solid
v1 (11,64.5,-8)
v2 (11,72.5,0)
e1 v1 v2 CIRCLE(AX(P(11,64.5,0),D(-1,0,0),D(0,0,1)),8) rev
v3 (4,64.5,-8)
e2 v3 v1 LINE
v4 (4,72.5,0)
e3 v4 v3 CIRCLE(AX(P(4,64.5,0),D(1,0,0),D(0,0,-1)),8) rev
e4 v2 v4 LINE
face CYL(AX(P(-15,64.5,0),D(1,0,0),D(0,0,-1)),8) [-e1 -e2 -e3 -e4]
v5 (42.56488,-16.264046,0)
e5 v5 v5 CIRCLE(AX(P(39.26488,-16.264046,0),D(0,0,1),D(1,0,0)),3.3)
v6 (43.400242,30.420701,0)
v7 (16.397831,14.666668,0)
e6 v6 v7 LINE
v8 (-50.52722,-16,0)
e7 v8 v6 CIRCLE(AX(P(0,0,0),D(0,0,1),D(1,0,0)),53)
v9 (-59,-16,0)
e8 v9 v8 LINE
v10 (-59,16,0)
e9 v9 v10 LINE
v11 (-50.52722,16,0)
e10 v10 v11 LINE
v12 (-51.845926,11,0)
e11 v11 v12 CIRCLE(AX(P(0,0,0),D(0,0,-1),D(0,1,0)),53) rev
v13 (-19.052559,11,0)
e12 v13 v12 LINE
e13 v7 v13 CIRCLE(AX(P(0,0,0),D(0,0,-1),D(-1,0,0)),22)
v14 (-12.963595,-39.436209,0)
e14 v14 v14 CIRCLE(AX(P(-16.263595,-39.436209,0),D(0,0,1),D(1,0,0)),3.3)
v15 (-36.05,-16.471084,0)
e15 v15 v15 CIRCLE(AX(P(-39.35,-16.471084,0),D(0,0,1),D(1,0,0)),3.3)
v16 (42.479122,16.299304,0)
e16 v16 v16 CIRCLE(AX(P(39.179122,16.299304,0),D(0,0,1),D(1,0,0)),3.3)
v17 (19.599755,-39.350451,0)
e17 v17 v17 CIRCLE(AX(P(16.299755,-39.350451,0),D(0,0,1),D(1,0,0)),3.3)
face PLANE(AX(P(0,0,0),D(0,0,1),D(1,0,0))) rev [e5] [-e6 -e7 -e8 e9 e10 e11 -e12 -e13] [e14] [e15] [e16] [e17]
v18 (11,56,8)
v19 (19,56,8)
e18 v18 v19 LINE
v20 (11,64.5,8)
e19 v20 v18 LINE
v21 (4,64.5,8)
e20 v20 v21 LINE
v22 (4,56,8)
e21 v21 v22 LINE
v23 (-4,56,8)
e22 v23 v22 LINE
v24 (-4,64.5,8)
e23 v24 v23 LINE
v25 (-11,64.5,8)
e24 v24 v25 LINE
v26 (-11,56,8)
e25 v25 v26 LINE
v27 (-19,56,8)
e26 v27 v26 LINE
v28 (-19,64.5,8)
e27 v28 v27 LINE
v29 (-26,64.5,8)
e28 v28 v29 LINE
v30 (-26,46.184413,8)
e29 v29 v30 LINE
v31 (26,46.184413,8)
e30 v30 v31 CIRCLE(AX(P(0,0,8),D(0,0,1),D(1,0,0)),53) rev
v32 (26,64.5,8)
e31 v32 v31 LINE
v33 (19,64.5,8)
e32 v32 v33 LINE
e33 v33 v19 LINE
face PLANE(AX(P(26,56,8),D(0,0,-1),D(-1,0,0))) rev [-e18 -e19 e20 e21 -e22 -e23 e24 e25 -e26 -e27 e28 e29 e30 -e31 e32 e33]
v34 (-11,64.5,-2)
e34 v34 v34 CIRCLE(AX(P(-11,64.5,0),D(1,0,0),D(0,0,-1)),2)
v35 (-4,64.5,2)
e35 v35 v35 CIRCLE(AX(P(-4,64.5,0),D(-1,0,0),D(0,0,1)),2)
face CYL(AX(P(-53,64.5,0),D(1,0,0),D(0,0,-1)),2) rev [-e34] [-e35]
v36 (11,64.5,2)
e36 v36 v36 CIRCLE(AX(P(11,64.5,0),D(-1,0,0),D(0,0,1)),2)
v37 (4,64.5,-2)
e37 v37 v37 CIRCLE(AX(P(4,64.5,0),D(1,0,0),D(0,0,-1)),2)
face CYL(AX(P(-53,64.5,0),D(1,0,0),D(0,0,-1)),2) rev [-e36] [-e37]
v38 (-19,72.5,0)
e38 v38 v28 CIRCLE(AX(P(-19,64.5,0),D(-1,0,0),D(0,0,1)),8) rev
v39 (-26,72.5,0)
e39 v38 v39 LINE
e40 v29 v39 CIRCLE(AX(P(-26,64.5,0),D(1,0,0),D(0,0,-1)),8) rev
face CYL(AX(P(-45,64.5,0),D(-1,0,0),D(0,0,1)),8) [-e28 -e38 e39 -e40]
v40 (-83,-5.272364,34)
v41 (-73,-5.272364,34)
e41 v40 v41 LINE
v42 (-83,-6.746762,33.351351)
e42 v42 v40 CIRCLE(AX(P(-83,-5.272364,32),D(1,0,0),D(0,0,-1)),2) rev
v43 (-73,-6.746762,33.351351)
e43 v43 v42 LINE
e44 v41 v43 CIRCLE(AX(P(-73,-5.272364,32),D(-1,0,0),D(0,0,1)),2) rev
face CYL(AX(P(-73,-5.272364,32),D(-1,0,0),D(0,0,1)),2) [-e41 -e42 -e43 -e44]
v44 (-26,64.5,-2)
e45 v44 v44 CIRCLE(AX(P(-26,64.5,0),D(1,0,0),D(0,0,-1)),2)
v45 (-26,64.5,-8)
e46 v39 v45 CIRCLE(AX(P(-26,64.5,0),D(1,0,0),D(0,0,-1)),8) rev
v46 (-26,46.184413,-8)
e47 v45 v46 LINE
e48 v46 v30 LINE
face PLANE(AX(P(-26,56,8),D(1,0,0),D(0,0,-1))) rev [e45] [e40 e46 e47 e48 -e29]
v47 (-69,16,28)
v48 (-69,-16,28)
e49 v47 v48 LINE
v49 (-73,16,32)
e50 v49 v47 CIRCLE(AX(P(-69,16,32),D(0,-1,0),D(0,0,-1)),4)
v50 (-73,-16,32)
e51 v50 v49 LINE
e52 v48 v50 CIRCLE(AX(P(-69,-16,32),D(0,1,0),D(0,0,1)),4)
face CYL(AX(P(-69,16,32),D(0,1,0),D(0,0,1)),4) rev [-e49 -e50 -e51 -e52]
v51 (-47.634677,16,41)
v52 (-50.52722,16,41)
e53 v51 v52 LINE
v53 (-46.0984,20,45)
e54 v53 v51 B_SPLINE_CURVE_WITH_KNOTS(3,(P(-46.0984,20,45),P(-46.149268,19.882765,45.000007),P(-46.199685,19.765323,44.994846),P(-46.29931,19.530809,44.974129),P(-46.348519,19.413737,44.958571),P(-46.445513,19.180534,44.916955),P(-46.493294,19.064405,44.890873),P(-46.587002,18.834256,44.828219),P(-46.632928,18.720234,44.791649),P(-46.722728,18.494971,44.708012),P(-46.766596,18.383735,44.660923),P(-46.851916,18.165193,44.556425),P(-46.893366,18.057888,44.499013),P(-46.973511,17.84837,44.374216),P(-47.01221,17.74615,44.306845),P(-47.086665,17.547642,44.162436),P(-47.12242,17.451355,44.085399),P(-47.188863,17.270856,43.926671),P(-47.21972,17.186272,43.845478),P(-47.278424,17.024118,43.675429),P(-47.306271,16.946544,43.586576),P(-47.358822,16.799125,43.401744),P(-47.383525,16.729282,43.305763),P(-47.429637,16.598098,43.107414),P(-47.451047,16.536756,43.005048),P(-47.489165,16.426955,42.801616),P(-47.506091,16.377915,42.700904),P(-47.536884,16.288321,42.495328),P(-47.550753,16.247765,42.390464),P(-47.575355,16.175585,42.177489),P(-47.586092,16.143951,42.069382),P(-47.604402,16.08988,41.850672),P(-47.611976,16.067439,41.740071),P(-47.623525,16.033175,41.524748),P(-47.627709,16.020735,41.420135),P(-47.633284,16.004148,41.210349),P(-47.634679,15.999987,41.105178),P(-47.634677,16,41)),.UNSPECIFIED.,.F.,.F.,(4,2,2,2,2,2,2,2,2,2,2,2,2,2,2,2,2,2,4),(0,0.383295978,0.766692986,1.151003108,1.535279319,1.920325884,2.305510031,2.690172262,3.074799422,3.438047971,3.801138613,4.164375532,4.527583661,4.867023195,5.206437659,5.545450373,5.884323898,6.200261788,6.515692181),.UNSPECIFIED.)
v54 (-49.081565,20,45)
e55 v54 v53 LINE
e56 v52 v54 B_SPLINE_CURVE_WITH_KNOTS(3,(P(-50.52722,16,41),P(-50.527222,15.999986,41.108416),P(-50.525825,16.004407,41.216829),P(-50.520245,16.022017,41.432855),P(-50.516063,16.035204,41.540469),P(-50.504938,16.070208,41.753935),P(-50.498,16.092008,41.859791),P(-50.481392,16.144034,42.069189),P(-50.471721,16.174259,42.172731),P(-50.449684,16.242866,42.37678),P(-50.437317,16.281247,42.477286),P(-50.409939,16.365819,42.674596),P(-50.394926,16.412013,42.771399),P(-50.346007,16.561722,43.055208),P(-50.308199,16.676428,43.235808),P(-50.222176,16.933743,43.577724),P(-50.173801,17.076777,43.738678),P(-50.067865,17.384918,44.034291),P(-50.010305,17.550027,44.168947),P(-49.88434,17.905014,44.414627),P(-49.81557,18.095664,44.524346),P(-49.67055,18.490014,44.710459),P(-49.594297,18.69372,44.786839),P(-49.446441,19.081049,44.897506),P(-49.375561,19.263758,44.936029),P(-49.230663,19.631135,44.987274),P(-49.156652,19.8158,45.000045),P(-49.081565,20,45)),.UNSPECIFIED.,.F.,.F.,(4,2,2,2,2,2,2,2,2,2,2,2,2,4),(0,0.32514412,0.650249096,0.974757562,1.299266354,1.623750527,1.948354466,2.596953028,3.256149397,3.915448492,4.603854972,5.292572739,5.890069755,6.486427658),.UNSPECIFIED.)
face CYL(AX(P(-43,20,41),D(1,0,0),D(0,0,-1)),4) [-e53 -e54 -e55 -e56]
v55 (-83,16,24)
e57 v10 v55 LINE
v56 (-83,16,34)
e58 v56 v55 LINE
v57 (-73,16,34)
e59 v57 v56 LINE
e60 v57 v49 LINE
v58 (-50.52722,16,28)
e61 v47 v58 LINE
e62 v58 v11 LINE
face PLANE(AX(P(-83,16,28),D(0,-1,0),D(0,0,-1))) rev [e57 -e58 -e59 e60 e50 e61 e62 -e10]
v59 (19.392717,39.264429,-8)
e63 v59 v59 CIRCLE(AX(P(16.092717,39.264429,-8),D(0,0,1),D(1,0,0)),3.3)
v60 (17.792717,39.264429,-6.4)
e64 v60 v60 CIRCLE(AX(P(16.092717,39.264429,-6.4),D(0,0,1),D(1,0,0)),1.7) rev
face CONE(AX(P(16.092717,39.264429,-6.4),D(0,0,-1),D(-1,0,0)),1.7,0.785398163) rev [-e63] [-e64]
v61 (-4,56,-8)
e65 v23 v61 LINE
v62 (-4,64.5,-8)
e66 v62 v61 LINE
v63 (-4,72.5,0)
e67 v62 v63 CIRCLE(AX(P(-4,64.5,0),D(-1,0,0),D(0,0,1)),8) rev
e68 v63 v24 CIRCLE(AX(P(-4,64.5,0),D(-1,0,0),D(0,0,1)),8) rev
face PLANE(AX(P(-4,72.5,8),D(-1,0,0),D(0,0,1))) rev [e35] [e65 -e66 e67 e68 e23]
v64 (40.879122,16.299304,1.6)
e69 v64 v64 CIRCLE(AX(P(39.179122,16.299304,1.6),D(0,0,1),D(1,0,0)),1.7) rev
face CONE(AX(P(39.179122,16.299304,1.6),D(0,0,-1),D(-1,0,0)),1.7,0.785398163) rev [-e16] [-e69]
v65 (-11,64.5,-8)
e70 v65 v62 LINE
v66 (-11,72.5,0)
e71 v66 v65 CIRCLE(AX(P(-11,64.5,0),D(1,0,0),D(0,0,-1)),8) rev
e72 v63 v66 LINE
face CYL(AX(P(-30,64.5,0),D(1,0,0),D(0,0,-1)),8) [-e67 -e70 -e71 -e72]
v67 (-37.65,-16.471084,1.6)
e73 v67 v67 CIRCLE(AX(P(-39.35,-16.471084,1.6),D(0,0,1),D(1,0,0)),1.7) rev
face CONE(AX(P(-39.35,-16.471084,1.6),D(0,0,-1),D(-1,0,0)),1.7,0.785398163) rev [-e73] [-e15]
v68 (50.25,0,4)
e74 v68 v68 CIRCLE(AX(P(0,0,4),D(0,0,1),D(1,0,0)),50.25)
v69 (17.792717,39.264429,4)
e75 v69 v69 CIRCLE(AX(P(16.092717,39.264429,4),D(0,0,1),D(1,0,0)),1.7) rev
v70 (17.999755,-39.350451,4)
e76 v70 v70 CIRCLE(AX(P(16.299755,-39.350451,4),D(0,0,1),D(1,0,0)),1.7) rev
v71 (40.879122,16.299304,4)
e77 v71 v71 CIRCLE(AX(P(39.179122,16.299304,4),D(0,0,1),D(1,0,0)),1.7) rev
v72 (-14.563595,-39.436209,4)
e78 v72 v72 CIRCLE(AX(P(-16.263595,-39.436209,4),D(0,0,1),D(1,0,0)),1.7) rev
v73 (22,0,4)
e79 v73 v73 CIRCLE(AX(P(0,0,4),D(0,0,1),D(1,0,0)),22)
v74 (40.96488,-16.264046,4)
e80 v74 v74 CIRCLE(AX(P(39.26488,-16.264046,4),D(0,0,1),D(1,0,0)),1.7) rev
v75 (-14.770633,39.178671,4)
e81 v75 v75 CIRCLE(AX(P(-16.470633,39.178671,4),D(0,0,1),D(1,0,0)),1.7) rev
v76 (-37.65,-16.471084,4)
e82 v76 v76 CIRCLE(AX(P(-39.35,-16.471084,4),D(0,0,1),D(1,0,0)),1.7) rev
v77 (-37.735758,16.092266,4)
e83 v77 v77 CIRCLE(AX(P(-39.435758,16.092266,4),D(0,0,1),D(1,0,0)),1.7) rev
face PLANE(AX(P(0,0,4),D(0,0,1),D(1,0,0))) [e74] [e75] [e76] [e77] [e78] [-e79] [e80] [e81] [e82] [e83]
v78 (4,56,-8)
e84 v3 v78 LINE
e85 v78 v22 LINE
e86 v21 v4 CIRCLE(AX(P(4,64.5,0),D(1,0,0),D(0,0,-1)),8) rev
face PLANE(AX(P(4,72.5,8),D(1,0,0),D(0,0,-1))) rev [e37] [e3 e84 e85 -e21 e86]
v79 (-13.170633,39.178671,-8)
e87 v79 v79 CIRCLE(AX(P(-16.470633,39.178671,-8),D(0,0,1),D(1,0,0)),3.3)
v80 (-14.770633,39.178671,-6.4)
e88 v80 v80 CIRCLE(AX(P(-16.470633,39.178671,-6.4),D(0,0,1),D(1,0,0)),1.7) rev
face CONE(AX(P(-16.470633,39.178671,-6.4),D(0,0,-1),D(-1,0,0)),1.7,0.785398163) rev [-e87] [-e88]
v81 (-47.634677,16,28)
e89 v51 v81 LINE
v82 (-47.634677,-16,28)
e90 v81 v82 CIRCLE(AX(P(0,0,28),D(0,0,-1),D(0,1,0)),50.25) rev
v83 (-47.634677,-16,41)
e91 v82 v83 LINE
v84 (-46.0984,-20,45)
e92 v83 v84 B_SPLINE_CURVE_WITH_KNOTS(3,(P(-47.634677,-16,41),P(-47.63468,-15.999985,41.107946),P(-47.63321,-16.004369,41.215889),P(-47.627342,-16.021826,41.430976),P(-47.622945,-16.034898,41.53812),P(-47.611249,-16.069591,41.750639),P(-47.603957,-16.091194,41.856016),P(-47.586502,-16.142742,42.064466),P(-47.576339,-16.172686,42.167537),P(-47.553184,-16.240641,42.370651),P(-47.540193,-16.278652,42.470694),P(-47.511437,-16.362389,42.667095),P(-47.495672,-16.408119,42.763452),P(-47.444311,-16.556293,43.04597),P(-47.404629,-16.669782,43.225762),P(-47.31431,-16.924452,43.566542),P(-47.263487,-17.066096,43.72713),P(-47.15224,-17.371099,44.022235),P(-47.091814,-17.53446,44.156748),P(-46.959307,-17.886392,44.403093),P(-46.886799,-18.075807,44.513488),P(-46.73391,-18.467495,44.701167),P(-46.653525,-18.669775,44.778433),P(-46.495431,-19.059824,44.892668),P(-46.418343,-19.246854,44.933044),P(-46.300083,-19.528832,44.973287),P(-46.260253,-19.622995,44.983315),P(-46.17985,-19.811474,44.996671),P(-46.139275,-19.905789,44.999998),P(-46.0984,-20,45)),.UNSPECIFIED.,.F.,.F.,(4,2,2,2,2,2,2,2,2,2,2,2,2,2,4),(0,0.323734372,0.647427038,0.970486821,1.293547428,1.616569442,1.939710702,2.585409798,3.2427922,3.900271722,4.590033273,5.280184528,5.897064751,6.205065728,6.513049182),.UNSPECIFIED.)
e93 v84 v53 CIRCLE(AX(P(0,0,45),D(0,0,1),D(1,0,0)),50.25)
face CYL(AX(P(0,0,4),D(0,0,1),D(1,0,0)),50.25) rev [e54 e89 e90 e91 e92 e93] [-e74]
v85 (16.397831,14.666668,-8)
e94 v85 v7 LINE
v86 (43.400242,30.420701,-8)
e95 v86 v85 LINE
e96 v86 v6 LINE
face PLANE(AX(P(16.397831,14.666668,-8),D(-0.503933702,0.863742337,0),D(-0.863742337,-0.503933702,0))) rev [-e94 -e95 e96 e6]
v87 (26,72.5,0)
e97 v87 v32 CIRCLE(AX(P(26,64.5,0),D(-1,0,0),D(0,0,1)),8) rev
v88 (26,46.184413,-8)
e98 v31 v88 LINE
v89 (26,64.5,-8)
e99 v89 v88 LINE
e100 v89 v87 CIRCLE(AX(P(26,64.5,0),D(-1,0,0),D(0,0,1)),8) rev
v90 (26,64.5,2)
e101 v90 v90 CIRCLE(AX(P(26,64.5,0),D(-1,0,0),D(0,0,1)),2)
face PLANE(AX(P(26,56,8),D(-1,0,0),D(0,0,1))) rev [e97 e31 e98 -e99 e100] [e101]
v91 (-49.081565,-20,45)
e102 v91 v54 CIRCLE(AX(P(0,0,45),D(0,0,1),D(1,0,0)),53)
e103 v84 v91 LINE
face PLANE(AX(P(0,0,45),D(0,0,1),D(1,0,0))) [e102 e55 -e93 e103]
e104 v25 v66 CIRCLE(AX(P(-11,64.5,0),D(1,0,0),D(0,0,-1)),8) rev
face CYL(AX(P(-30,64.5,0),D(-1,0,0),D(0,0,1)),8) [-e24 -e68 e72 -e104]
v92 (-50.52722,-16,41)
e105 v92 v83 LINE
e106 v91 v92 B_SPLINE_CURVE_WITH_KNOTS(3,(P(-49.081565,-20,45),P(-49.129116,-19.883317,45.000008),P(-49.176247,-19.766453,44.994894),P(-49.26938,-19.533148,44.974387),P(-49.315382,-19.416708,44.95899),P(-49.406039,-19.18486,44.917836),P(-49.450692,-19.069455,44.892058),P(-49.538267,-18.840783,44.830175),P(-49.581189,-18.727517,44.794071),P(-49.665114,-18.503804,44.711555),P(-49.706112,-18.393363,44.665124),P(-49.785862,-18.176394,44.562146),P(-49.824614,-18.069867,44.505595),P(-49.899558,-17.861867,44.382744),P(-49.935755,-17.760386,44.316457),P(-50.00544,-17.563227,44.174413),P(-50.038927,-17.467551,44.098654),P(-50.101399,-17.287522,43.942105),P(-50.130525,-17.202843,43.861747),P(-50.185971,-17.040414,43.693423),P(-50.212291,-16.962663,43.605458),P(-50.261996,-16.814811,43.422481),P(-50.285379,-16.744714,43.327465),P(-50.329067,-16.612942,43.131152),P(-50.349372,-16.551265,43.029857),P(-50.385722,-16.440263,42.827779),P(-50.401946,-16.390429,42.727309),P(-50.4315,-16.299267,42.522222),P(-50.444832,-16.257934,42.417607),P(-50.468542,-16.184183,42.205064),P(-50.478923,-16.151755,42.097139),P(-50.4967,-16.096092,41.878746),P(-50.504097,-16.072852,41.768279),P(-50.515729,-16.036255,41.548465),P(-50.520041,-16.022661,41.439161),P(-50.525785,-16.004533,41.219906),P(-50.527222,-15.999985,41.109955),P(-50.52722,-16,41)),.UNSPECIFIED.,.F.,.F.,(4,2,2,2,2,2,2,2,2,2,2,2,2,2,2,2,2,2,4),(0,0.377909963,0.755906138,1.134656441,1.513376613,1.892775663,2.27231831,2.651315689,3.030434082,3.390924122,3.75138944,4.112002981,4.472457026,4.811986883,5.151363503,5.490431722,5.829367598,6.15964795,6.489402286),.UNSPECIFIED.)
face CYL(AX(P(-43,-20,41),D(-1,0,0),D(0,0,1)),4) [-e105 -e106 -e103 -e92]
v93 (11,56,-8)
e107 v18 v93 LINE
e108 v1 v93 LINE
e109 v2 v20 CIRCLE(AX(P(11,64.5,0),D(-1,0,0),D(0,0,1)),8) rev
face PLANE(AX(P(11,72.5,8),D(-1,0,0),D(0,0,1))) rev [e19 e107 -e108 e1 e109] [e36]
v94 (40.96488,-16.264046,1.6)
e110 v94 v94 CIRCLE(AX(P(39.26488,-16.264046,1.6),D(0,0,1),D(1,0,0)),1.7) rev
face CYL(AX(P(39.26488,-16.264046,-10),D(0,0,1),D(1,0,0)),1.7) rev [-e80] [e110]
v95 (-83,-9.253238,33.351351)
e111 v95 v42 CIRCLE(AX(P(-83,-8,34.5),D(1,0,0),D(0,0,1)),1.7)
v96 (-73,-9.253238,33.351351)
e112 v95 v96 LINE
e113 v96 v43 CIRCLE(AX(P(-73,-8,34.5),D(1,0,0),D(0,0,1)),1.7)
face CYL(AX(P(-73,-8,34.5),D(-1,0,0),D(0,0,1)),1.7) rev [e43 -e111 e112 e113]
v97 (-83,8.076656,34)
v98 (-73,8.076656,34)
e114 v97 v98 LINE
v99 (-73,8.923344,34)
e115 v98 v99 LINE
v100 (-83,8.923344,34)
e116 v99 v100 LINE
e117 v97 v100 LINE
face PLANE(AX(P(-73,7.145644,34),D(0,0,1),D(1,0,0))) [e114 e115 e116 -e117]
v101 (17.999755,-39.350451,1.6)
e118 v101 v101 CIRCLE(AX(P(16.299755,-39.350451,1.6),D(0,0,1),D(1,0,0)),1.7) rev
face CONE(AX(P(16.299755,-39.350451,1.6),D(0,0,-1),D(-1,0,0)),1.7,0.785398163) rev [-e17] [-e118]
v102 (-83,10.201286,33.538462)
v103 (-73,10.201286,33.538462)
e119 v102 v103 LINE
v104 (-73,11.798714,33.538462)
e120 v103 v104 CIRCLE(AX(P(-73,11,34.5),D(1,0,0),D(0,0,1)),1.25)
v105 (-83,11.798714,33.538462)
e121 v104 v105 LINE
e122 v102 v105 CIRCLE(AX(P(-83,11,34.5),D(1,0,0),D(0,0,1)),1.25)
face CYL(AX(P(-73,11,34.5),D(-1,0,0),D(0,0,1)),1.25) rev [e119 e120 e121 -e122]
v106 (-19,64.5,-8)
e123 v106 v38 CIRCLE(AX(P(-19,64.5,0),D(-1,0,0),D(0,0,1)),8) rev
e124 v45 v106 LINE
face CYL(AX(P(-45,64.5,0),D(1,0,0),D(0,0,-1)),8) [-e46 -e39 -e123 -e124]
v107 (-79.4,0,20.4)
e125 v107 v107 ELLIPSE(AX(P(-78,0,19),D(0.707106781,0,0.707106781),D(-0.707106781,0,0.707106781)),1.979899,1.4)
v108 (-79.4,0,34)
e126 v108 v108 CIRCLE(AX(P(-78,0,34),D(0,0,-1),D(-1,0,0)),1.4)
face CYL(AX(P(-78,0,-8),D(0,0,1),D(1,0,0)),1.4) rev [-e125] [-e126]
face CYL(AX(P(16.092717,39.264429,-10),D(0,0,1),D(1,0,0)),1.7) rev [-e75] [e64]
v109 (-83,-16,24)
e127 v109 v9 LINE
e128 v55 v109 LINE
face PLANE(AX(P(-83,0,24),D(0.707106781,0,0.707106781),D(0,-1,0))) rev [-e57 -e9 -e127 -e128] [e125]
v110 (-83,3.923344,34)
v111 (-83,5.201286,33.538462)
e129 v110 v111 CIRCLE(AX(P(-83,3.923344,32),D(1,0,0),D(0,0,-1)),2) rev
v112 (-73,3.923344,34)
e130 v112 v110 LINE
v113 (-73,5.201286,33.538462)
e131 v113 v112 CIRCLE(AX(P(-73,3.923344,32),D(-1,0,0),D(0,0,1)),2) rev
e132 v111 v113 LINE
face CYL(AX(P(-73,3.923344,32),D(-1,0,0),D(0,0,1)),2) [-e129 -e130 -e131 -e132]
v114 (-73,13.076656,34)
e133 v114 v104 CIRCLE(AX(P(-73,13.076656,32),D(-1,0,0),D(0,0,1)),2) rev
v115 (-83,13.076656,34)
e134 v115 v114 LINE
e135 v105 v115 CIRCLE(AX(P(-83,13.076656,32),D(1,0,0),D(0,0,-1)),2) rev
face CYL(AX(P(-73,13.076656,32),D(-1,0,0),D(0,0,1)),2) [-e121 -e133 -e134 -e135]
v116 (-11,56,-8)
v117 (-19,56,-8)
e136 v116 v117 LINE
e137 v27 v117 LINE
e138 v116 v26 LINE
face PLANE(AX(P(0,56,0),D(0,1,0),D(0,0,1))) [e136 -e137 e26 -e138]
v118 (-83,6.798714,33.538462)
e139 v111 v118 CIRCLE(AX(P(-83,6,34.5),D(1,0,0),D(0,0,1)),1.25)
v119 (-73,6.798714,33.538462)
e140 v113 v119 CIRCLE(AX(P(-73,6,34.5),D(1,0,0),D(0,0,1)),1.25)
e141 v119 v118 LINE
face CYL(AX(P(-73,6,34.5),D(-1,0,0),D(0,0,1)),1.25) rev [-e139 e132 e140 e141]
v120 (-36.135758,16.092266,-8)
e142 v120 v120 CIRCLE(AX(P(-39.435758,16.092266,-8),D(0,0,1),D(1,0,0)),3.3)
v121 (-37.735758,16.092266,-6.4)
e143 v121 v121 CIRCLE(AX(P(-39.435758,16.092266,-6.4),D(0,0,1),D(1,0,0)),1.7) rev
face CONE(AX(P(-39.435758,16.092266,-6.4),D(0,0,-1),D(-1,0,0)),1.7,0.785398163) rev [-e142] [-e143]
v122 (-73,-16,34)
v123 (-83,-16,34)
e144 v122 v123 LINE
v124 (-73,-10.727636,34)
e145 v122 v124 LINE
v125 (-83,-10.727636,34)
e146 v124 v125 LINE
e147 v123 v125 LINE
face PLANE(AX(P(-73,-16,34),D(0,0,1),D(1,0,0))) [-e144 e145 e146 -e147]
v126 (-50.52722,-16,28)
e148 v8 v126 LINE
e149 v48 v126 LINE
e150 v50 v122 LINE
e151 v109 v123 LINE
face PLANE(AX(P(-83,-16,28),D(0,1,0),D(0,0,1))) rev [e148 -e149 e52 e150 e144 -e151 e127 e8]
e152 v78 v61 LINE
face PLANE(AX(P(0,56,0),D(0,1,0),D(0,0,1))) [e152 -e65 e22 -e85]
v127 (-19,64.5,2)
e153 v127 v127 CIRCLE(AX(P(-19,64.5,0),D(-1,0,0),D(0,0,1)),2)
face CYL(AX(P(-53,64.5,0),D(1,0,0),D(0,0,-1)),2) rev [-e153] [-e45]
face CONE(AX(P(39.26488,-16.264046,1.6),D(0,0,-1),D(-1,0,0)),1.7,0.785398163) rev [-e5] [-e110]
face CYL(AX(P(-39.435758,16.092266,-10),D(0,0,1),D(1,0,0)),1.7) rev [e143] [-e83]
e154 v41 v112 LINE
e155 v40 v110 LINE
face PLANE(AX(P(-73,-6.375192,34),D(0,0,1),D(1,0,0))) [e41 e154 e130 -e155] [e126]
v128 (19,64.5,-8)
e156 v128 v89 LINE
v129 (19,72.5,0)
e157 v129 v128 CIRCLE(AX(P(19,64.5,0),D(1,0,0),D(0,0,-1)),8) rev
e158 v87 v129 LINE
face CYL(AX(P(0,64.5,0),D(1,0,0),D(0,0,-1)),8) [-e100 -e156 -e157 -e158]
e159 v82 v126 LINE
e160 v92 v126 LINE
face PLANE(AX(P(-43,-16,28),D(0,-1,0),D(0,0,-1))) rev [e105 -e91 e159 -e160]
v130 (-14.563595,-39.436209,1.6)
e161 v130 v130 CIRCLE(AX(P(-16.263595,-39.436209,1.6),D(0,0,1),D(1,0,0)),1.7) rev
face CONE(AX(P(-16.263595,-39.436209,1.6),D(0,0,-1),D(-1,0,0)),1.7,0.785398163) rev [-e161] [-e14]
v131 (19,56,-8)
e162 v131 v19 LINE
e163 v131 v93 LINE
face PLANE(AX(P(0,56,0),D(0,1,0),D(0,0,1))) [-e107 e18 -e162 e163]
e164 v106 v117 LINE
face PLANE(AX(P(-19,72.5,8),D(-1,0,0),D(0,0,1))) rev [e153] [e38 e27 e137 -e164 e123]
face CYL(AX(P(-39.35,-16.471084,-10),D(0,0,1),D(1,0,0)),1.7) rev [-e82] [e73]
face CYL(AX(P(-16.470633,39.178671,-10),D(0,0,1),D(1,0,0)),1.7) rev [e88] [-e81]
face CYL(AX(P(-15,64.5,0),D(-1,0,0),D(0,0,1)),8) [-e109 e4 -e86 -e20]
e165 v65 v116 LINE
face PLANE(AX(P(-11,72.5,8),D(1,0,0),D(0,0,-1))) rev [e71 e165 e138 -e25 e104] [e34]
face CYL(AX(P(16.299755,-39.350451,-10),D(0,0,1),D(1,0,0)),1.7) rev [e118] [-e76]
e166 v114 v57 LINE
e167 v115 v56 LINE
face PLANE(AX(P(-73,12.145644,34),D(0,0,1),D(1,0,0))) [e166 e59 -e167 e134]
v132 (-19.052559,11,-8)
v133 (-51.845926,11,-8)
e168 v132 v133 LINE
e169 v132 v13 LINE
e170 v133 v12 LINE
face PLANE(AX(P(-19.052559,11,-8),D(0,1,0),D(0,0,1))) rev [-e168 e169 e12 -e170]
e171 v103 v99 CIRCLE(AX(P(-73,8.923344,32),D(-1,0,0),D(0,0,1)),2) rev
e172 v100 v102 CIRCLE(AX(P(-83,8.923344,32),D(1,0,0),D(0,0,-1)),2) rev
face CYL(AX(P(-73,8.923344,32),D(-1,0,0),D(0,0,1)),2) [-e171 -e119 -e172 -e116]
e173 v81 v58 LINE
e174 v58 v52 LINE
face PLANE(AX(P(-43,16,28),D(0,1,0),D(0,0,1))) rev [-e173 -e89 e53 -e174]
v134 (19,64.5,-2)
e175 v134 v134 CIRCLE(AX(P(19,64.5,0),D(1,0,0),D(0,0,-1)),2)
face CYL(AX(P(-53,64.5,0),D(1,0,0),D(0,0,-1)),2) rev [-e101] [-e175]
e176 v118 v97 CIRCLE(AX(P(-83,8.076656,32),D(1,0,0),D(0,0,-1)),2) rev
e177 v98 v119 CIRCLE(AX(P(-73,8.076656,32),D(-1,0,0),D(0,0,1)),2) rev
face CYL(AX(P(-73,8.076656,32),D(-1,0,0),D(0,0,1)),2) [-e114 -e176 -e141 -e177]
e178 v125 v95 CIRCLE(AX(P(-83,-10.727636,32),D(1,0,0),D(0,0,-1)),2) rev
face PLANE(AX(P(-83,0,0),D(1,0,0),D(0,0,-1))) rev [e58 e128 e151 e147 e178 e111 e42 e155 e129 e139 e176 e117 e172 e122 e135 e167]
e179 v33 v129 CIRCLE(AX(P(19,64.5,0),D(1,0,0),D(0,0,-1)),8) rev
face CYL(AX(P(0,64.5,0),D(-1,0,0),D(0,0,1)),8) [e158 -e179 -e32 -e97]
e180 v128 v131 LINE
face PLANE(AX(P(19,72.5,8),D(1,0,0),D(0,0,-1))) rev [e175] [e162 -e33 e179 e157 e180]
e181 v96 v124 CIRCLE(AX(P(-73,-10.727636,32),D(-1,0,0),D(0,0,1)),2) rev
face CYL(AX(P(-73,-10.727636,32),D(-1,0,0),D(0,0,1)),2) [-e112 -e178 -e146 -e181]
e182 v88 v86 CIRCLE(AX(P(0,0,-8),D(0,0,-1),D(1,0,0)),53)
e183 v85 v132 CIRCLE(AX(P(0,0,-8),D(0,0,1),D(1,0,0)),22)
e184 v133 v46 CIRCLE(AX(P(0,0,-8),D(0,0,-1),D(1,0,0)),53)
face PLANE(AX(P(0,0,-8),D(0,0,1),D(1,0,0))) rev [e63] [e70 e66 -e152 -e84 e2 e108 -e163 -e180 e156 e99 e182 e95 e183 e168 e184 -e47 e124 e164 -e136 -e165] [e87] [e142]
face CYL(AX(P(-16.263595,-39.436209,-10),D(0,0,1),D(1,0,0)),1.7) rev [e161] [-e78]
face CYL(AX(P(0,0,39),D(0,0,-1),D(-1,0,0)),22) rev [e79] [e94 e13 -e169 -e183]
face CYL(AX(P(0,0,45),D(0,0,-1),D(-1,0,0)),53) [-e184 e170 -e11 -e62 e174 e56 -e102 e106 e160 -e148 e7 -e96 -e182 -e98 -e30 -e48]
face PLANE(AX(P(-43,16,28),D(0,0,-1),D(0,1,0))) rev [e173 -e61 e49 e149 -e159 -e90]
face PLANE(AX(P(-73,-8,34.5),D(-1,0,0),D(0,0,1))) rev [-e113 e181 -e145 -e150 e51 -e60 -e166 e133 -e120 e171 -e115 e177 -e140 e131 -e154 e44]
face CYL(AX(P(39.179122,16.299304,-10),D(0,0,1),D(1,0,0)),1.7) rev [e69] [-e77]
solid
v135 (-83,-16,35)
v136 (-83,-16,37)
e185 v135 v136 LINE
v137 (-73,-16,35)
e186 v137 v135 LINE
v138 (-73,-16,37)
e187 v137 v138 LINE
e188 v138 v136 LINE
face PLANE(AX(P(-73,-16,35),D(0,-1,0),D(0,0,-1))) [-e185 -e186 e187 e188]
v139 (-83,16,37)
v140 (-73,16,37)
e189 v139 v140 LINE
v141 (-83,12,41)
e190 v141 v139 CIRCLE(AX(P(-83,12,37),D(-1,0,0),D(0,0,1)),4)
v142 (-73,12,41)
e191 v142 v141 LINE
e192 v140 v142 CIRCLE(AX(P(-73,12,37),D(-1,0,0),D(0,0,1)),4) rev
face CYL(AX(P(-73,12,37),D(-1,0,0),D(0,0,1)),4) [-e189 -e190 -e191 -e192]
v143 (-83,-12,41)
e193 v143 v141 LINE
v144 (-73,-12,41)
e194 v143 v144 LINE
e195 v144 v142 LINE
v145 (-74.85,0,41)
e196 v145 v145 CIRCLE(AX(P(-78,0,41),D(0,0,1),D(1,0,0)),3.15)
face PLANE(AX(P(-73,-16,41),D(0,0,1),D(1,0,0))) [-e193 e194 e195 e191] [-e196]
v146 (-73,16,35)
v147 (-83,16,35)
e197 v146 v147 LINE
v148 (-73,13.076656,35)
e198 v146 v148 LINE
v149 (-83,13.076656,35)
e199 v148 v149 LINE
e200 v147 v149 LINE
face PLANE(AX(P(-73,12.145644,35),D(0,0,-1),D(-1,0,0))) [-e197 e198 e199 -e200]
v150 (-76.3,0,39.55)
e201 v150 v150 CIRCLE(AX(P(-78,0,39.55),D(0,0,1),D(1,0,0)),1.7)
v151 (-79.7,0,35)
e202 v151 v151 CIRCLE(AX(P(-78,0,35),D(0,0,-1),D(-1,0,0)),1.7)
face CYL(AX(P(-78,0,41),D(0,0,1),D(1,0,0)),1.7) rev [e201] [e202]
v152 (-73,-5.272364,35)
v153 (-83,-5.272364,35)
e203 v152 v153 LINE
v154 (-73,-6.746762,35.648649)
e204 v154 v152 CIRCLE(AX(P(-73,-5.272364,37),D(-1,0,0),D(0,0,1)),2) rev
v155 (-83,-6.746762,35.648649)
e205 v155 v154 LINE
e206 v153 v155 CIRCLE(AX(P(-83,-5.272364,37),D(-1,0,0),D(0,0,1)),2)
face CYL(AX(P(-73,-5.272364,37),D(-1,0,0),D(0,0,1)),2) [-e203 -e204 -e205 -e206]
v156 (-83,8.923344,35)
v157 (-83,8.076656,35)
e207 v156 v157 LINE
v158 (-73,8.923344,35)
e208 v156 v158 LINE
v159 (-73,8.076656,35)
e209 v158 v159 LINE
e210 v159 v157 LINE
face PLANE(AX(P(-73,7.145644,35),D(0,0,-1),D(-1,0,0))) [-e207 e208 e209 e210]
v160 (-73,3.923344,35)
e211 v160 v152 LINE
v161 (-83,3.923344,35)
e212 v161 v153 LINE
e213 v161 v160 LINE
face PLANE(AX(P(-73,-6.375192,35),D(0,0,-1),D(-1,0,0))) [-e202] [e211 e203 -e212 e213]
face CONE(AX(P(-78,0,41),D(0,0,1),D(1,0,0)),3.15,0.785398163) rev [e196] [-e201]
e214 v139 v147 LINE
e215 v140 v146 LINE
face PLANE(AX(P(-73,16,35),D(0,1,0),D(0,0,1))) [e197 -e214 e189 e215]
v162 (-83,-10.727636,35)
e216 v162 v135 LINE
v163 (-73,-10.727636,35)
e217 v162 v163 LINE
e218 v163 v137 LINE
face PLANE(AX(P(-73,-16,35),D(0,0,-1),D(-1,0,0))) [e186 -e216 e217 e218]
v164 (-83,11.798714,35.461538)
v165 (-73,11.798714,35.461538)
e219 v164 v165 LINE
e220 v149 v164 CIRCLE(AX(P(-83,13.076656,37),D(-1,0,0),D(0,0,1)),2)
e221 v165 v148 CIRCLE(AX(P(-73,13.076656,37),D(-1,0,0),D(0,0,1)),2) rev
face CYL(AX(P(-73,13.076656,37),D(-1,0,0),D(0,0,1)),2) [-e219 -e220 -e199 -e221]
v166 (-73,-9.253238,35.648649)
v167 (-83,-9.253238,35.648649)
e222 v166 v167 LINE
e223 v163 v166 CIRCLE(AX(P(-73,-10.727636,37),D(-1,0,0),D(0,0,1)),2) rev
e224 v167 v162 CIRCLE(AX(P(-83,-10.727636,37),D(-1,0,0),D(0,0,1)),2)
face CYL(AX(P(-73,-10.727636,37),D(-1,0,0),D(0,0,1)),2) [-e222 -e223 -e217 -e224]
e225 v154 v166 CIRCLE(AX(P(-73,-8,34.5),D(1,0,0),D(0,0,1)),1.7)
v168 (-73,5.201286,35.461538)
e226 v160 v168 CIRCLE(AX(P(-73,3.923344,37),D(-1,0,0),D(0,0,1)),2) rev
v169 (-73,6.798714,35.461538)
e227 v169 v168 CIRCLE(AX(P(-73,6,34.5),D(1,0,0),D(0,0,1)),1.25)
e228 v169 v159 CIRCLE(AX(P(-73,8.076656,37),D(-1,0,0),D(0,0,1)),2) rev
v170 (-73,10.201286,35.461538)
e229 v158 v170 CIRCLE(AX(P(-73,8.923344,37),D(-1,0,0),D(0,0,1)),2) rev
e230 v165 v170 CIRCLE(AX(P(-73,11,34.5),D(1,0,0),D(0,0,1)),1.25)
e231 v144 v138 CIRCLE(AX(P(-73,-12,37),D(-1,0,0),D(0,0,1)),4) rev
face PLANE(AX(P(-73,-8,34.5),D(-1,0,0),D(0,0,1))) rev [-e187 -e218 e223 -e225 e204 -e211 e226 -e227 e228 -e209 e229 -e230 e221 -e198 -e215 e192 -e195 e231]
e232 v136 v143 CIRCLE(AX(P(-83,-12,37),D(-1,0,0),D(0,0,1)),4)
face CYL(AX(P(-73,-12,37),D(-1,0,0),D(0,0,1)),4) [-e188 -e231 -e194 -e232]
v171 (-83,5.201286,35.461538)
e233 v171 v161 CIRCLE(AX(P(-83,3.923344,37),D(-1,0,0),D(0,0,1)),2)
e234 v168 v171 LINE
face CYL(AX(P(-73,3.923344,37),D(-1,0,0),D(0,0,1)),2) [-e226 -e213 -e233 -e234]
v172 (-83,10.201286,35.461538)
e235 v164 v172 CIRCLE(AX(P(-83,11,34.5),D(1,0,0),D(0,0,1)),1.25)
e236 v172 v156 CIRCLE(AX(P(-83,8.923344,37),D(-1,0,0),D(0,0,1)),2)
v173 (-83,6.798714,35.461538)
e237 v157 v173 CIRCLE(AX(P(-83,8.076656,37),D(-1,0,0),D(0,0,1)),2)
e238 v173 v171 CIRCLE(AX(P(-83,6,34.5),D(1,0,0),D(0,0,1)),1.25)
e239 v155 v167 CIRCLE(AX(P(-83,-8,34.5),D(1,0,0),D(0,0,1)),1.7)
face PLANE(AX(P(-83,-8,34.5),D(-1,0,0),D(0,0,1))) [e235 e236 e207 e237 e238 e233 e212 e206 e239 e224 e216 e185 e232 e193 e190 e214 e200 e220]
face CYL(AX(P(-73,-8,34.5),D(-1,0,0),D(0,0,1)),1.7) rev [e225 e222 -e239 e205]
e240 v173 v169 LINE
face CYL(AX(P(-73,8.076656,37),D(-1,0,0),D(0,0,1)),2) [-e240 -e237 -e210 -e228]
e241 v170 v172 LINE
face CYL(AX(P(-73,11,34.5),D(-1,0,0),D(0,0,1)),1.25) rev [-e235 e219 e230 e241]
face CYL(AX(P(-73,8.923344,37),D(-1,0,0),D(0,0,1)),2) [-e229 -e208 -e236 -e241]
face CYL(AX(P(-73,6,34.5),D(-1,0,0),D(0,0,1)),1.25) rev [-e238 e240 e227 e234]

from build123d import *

# Parameters (mm, degrees)
SKETCH1_R               = 53
BOSS_EXTRUDE2_DEPTH     = 45
SKETCH2_R               = 50.25
CUT_EXTRUDE1_DEPTH      = 41
SKETCH4_R               = 22
CUT_EXTRUDE3_DEPTH      = 39
BOSS_EXTRUDE3_START     = 8
BOSS_EXTRUDE3_DEPTH     = 8
CUT_EXTRUDE5_DEPTH      = 10
CUT_EXTRUDE5_DEPTH_BACK = 10
SKETCH10_R              = 1.7
BOSS_EXTRUDE6_START     = -8
BOSS_EXTRUDE6_DEPTH     = 16
SKETCH13_W              = 7
SKETCH13_H              = 16
BOSS_EXTRUDE7_DEPTH     = 16.5
FILLET1_R               = 8
LPATTERN1_COUNT         = 4
LPATTERN1_PITCH         = 15
FILLET1_OF_LPATTERN1_R  = 8
CUT_EXTRUDE6_DEPTH      = 117.285209722
CUT_EXTRUDE6_DEPTH_BACK = 117.285209722
SKETCH14_R              = 2
CHAMFER1_SIZE           = 1.6
SKETCH15_W              = 27.561683899
SKETCH15_H              = 32
CUT_EXTRUDE7_DEPTH      = 10
BOSS_EXTRUDE8_START     = -2.47278
SKETCH17_W              = 28
SKETCH17_H              = 32
BOSS_EXTRUDE8_DEPTH     = 32.47278
CHAMFER2_SIZE           = 24
BOSS_EXTRUDE9_DEPTH     = 10
SKETCH25_R              = 1.4
CUT_EXTRUDE9_DEPTH      = 118.937483439
FILLET2_R               = 2
FILLET3_R               = 2
FILLET4_R               = 4
FILLET5_R               = 4
FILLET6_R               = 4


# Read off the part's stored shape, not the designer's step: Boss-Extrude6
with BuildPart() as part:
    # Sketch1 → Boss-Extrude2 (new body)
    with BuildSketch(Plane.XY):
        with Locations(Location((0, 0, 0), (0, 0, 180))):
            Circle(SKETCH1_R)
    extrude(amount=BOSS_EXTRUDE2_DEPTH)

    # Sketch2 → Cut-Extrude1 (cut)
    with BuildSketch(Plane.XY.offset(45)):
        Circle(SKETCH2_R)
    extrude(amount=-CUT_EXTRUDE1_DEPTH, mode=Mode.SUBTRACT)

    # Sketch4 → Cut-Extrude3 (cut)
    with BuildSketch(Plane(origin=(0, 0, 0), x_dir=(-1, 0, 0), z_dir=(0, 0, -1))):
        Circle(SKETCH4_R)
    extrude(amount=-CUT_EXTRUDE3_DEPTH, mode=Mode.SUBTRACT)

    # Sketch5 → Boss-Extrude3 (add)
    with BuildSketch(Plane(origin=(0, 0, 0), x_dir=(-1, 0, 0), z_dir=(0, 0, -1)).offset(BOSS_EXTRUDE3_START)):
        with BuildLine():
            Line((19.052558883, 11), (51.845925587, 11))
            ThreePointArc((51.845925587, 11), (10.588828865, 51.931461594), (-43.400241675, 30.42070056))
            Line((-43.400241675, 30.42070056), (-16.397830673, 14.666667965))
            ThreePointArc((-16.397830673, 14.666667965), (2.263406494, 21.883258236), (19.052558883, 11))
        make_face()
    extrude(amount=-BOSS_EXTRUDE3_DEPTH)

    # Sketch10 → Cut-Extrude5 (cut, two sides: drawn at the far end of the back side and taken through both)
    with BuildSketch(Plane(origin=(0, 0, 0), x_dir=(-1, 0, 0), z_dir=(0, 0, -1)).offset(-CUT_EXTRUDE5_DEPTH_BACK)):
        with Locations(Location((-39.264880132, -16.264045876, 0), (0, 0, 180))):
            Circle(SKETCH10_R)
        with Locations(Location((-39.17912216, 16.299303679, 0), (0, 0, 180))):
            Circle(SKETCH10_R)
        with Locations(Location((-16.092716827, 39.264428924, 0), (0, 0, 180))):
            Circle(SKETCH10_R)
        with Locations(Location((16.470632727, 39.178670952, 0), (0, 0, 180))):
            Circle(SKETCH10_R)
        with Locations(Location((39.435757972, 16.09226562, 0), (0, 0, 180))):
            Circle(SKETCH10_R)
        with Locations(Location((39.35, -16.471083935, 0), (0, 0, 180))):
            Circle(SKETCH10_R)
        with Locations(Location((16.263594668, -39.43620918, 0), (0, 0, 180))):
            Circle(SKETCH10_R)
        with Locations(Location((-16.299754887, -39.350451208, 0), (0, 0, 180))):
            Circle(SKETCH10_R)
    extrude(amount=CUT_EXTRUDE5_DEPTH + CUT_EXTRUDE5_DEPTH_BACK, mode=Mode.SUBTRACT)

    # Boss-Extrude6 outline → Boss-Extrude6 (add)
    with BuildSketch(Plane.XY.offset(BOSS_EXTRUDE6_START)):
        with BuildLine():
            Line((-26, 56), (-26, 46.184412955))
            ThreePointArc((-26, 46.184412955), (0, 53), (26, 46.184412955))
            Line((26, 46.184412955), (26, 56))
            Line((26, 56), (-26, 56))
        make_face()
    extrude(amount=BOSS_EXTRUDE6_DEPTH)

    # Sketch13 → Boss-Extrude7 (add)
    with BuildSketch(Plane(origin=(0, 56, 0), x_dir=(1, 0, 0), z_dir=(0, 1, 0))):
        with Locations((22.5, 0)):
            Rectangle(SKETCH13_W, SKETCH13_H)
    boss_extrude7 = extrude(amount=BOSS_EXTRUDE7_DEPTH)

    # Fillet1
    fillet1_edges = [part.edges().sort_by_distance(p)[0] for p in [
        (22.5, 72.5, 8),
        (22.5, 72.5, -8),
    ]]
    fillet(fillet1_edges, radius=FILLET1_R - 0.0001)  # a hair under: the kernel refuses the full size

    # LPattern1: Boss-Extrude7 ×4
    with Locations(*[(-i * LPATTERN1_PITCH, 0, 0) for i in range(1, LPATTERN1_COUNT)]):
        add(boss_extrude7)

    # Fillet1 of LPattern1
    fillet1_of_lpattern1_edges = [part.edges().sort_by_distance(p)[0] for p in [
        (7.5, 72.5, 8),
        (7.5, 72.5, -8),
        (-7.5, 72.5, 8),
        (-7.5, 72.5, -8),
        (-22.5, 72.5, 8),
        (-22.5, 72.5, -8),
    ]]
    fillet(fillet1_of_lpattern1_edges, radius=FILLET1_OF_LPATTERN1_R - 0.0001)  # a hair under: the kernel refuses the full size

    # Sketch14 → Cut-Extrude6 (cut, two sides: drawn at the far end of the back side and taken through both)
    with BuildSketch(Plane(origin=(26, 0, 0), x_dir=(0, 0, -1), z_dir=(1, 0, 0)).offset(-CUT_EXTRUDE6_DEPTH_BACK)):
        with Locations((0, 64.5)):
            Circle(SKETCH14_R)
    extrude(amount=CUT_EXTRUDE6_DEPTH + CUT_EXTRUDE6_DEPTH_BACK, mode=Mode.SUBTRACT)

    # Chamfer1
    chamfer1_edges = [part.edges().sort_by_distance(p)[0] for p in [
        (14.599754887, -39.350451208, 0),
        (-17.963594668, -39.43620918, 0),
        (-41.05, -16.471083935, 0),
        (-41.135757972, 16.09226562, -8),
        (-18.170632727, 39.178670952, -8),
        (14.392716827, 39.264428924, -8),
        (37.47912216, 16.299303679, 0),
        (37.564880132, -16.264045876, 0),
    ]]
    chamfer(chamfer1_edges, length=CHAMFER1_SIZE)

    # Sketch15 → Cut-Extrude7 (cut)
    with BuildSketch(Plane.ZY.offset(53)):
        with Locations((41.78084195, 0)):
            Rectangle(SKETCH15_W, SKETCH15_H)
    extrude(amount=-CUT_EXTRUDE7_DEPTH, mode=Mode.SUBTRACT)

    # Sketch17 → Boss-Extrude8 (add)
    with BuildSketch(Plane.ZY.offset(53).offset(BOSS_EXTRUDE8_START)):
        with Locations((14, 0)):
            Rectangle(SKETCH17_W, SKETCH17_H)
    extrude(amount=BOSS_EXTRUDE8_DEPTH)

    # Chamfer2
    chamfer2_edges = [part.edges().sort_by_distance(p)[0] for p in [
        (-83, 0, 0),
    ]]
    chamfer(chamfer2_edges, length=CHAMFER2_SIZE)

    # Sketch18 → Boss-Extrude9 (add)
    with BuildSketch(Plane.ZY.offset(83)):
        with BuildLine():
            Line((35, -16), (41, -16))
            Line((41, -16), (41, 16))
            Line((41, 16), (35, 16))
            Line((35, 16), (35, 12.145643924))
            ThreePointArc((35, 12.145643924), (35.75, 11), (35, 9.854356076))
            Line((35, 9.854356076), (35, 7.145643924))
            ThreePointArc((35, 7.145643924), (35.75, 6), (35, 4.854356076))
            Line((35, 4.854356076), (35, -6.375192319))
            ThreePointArc((35, -6.375192319), (36.2, -8), (35, -9.624807681))
            Line((35, -9.624807681), (35, -16))
        make_face()
        with BuildLine():
            Line((34, -16), (28, -16))
            Line((28, -16), (28, 16))
            Line((28, 16), (34, 16))
            Line((34, 16), (34, 12.145643924))
            ThreePointArc((34, 12.145643924), (33.25, 11), (34, 9.854356076))
            Line((34, 9.854356076), (34, 7.145643924))
            ThreePointArc((34, 7.145643924), (33.25, 6), (34, 4.854356076))
            Line((34, 4.854356076), (34, -6.375192319))
            ThreePointArc((34, -6.375192319), (32.8, -8), (34, -9.624807681))
            Line((34, -9.624807681), (34, -16))
        make_face()
    extrude(amount=-BOSS_EXTRUDE9_DEPTH)


with BuildPart() as boss_extrude9_piece_1:
    # of the separate pieces the step leaves, piece 1, a body of its own (boss_extrude9_pieces)
    add(part.part.solids().sort_by_distance((-59, 16, 0))[0])

    # Sketch25 → Cut-Extrude9 (cut, through all)
    with BuildSketch(Plane(origin=(0, 0, 34), x_dir=(-1, 0, 0), z_dir=(0, 0, -1))):
        with Locations((78, 0)):
            Circle(SKETCH25_R)
    extrude(amount=CUT_EXTRUDE9_DEPTH, mode=Mode.SUBTRACT)

    # Fillet3
    fillet3_edges = [boss_extrude9_piece_1.edges().sort_by_distance(p)[0] for p in [
        (-78, -9.624807681, 34),
        (-78, 12.145643924, 34),
        (-78, 9.854356076, 34),
        (-78, 7.145643924, 34),
        (-78, 4.854356076, 34),
        (-78, -6.375192319, 34),
    ]]
    fillet(fillet3_edges, radius=FILLET3_R)

    # Fillet4
    fillet4_edges = [boss_extrude9_piece_1.edges().sort_by_distance(p)[0] for p in [
        (-73, 0, 28),
    ]]
    fillet(fillet4_edges, radius=FILLET4_R)

    # Fillet5
    fillet5_edges = [boss_extrude9_piece_1.edges().sort_by_distance(p)[0] for p in [
        (-49.080948941, 16, 45),
        (-49.080948941, -16, 45),
    ]]
    fillet(fillet5_edges, radius=FILLET5_R)


with BuildPart() as boss_extrude9_piece_2:
    # of the separate pieces the step leaves, piece 2, a body of its own (boss_extrude9_pieces)
    add(part.part.solids().sort_by_distance((-83, -9.624807681, 35))[0])

    # Sketch22 → CSK for M3 Countersunk Flat Head Screw1 (revolve, cut)
    with BuildSketch(Plane(origin=(-78, 0, 41), x_dir=(0, -1, 0), z_dir=(1, 0, 0))):
        Polygon((0, 0), (0, 6), (1.7, 6), (1.7, 1.45), (3.15, 0), align=None)
    revolve(axis=Axis((-78, 0, 47.35), (0, 0, -1)), mode=Mode.SUBTRACT)

    # Fillet2
    fillet2_edges = [boss_extrude9_piece_2.edges().sort_by_distance(p)[0] for p in [
        (-78, -9.624807681, 35),
        (-78, -6.375192319, 35),
        (-78, 4.854356076, 35),
        (-78, 7.145643924, 35),
        (-78, 9.854356076, 35),
        (-78, 12.145643924, 35),
    ]]
    fillet(fillet2_edges, radius=FILLET2_R)

    # Fillet6
    fillet6_edges = [boss_extrude9_piece_2.edges().sort_by_distance(p)[0] for p in [
        (-78, 16, 41),
        (-78, -16, 41),
    ]]
    fillet(fillet6_edges, radius=FILLET6_R)


solid = Compound([boss_extrude9_piece_1.part, boss_extrude9_piece_2.part])
